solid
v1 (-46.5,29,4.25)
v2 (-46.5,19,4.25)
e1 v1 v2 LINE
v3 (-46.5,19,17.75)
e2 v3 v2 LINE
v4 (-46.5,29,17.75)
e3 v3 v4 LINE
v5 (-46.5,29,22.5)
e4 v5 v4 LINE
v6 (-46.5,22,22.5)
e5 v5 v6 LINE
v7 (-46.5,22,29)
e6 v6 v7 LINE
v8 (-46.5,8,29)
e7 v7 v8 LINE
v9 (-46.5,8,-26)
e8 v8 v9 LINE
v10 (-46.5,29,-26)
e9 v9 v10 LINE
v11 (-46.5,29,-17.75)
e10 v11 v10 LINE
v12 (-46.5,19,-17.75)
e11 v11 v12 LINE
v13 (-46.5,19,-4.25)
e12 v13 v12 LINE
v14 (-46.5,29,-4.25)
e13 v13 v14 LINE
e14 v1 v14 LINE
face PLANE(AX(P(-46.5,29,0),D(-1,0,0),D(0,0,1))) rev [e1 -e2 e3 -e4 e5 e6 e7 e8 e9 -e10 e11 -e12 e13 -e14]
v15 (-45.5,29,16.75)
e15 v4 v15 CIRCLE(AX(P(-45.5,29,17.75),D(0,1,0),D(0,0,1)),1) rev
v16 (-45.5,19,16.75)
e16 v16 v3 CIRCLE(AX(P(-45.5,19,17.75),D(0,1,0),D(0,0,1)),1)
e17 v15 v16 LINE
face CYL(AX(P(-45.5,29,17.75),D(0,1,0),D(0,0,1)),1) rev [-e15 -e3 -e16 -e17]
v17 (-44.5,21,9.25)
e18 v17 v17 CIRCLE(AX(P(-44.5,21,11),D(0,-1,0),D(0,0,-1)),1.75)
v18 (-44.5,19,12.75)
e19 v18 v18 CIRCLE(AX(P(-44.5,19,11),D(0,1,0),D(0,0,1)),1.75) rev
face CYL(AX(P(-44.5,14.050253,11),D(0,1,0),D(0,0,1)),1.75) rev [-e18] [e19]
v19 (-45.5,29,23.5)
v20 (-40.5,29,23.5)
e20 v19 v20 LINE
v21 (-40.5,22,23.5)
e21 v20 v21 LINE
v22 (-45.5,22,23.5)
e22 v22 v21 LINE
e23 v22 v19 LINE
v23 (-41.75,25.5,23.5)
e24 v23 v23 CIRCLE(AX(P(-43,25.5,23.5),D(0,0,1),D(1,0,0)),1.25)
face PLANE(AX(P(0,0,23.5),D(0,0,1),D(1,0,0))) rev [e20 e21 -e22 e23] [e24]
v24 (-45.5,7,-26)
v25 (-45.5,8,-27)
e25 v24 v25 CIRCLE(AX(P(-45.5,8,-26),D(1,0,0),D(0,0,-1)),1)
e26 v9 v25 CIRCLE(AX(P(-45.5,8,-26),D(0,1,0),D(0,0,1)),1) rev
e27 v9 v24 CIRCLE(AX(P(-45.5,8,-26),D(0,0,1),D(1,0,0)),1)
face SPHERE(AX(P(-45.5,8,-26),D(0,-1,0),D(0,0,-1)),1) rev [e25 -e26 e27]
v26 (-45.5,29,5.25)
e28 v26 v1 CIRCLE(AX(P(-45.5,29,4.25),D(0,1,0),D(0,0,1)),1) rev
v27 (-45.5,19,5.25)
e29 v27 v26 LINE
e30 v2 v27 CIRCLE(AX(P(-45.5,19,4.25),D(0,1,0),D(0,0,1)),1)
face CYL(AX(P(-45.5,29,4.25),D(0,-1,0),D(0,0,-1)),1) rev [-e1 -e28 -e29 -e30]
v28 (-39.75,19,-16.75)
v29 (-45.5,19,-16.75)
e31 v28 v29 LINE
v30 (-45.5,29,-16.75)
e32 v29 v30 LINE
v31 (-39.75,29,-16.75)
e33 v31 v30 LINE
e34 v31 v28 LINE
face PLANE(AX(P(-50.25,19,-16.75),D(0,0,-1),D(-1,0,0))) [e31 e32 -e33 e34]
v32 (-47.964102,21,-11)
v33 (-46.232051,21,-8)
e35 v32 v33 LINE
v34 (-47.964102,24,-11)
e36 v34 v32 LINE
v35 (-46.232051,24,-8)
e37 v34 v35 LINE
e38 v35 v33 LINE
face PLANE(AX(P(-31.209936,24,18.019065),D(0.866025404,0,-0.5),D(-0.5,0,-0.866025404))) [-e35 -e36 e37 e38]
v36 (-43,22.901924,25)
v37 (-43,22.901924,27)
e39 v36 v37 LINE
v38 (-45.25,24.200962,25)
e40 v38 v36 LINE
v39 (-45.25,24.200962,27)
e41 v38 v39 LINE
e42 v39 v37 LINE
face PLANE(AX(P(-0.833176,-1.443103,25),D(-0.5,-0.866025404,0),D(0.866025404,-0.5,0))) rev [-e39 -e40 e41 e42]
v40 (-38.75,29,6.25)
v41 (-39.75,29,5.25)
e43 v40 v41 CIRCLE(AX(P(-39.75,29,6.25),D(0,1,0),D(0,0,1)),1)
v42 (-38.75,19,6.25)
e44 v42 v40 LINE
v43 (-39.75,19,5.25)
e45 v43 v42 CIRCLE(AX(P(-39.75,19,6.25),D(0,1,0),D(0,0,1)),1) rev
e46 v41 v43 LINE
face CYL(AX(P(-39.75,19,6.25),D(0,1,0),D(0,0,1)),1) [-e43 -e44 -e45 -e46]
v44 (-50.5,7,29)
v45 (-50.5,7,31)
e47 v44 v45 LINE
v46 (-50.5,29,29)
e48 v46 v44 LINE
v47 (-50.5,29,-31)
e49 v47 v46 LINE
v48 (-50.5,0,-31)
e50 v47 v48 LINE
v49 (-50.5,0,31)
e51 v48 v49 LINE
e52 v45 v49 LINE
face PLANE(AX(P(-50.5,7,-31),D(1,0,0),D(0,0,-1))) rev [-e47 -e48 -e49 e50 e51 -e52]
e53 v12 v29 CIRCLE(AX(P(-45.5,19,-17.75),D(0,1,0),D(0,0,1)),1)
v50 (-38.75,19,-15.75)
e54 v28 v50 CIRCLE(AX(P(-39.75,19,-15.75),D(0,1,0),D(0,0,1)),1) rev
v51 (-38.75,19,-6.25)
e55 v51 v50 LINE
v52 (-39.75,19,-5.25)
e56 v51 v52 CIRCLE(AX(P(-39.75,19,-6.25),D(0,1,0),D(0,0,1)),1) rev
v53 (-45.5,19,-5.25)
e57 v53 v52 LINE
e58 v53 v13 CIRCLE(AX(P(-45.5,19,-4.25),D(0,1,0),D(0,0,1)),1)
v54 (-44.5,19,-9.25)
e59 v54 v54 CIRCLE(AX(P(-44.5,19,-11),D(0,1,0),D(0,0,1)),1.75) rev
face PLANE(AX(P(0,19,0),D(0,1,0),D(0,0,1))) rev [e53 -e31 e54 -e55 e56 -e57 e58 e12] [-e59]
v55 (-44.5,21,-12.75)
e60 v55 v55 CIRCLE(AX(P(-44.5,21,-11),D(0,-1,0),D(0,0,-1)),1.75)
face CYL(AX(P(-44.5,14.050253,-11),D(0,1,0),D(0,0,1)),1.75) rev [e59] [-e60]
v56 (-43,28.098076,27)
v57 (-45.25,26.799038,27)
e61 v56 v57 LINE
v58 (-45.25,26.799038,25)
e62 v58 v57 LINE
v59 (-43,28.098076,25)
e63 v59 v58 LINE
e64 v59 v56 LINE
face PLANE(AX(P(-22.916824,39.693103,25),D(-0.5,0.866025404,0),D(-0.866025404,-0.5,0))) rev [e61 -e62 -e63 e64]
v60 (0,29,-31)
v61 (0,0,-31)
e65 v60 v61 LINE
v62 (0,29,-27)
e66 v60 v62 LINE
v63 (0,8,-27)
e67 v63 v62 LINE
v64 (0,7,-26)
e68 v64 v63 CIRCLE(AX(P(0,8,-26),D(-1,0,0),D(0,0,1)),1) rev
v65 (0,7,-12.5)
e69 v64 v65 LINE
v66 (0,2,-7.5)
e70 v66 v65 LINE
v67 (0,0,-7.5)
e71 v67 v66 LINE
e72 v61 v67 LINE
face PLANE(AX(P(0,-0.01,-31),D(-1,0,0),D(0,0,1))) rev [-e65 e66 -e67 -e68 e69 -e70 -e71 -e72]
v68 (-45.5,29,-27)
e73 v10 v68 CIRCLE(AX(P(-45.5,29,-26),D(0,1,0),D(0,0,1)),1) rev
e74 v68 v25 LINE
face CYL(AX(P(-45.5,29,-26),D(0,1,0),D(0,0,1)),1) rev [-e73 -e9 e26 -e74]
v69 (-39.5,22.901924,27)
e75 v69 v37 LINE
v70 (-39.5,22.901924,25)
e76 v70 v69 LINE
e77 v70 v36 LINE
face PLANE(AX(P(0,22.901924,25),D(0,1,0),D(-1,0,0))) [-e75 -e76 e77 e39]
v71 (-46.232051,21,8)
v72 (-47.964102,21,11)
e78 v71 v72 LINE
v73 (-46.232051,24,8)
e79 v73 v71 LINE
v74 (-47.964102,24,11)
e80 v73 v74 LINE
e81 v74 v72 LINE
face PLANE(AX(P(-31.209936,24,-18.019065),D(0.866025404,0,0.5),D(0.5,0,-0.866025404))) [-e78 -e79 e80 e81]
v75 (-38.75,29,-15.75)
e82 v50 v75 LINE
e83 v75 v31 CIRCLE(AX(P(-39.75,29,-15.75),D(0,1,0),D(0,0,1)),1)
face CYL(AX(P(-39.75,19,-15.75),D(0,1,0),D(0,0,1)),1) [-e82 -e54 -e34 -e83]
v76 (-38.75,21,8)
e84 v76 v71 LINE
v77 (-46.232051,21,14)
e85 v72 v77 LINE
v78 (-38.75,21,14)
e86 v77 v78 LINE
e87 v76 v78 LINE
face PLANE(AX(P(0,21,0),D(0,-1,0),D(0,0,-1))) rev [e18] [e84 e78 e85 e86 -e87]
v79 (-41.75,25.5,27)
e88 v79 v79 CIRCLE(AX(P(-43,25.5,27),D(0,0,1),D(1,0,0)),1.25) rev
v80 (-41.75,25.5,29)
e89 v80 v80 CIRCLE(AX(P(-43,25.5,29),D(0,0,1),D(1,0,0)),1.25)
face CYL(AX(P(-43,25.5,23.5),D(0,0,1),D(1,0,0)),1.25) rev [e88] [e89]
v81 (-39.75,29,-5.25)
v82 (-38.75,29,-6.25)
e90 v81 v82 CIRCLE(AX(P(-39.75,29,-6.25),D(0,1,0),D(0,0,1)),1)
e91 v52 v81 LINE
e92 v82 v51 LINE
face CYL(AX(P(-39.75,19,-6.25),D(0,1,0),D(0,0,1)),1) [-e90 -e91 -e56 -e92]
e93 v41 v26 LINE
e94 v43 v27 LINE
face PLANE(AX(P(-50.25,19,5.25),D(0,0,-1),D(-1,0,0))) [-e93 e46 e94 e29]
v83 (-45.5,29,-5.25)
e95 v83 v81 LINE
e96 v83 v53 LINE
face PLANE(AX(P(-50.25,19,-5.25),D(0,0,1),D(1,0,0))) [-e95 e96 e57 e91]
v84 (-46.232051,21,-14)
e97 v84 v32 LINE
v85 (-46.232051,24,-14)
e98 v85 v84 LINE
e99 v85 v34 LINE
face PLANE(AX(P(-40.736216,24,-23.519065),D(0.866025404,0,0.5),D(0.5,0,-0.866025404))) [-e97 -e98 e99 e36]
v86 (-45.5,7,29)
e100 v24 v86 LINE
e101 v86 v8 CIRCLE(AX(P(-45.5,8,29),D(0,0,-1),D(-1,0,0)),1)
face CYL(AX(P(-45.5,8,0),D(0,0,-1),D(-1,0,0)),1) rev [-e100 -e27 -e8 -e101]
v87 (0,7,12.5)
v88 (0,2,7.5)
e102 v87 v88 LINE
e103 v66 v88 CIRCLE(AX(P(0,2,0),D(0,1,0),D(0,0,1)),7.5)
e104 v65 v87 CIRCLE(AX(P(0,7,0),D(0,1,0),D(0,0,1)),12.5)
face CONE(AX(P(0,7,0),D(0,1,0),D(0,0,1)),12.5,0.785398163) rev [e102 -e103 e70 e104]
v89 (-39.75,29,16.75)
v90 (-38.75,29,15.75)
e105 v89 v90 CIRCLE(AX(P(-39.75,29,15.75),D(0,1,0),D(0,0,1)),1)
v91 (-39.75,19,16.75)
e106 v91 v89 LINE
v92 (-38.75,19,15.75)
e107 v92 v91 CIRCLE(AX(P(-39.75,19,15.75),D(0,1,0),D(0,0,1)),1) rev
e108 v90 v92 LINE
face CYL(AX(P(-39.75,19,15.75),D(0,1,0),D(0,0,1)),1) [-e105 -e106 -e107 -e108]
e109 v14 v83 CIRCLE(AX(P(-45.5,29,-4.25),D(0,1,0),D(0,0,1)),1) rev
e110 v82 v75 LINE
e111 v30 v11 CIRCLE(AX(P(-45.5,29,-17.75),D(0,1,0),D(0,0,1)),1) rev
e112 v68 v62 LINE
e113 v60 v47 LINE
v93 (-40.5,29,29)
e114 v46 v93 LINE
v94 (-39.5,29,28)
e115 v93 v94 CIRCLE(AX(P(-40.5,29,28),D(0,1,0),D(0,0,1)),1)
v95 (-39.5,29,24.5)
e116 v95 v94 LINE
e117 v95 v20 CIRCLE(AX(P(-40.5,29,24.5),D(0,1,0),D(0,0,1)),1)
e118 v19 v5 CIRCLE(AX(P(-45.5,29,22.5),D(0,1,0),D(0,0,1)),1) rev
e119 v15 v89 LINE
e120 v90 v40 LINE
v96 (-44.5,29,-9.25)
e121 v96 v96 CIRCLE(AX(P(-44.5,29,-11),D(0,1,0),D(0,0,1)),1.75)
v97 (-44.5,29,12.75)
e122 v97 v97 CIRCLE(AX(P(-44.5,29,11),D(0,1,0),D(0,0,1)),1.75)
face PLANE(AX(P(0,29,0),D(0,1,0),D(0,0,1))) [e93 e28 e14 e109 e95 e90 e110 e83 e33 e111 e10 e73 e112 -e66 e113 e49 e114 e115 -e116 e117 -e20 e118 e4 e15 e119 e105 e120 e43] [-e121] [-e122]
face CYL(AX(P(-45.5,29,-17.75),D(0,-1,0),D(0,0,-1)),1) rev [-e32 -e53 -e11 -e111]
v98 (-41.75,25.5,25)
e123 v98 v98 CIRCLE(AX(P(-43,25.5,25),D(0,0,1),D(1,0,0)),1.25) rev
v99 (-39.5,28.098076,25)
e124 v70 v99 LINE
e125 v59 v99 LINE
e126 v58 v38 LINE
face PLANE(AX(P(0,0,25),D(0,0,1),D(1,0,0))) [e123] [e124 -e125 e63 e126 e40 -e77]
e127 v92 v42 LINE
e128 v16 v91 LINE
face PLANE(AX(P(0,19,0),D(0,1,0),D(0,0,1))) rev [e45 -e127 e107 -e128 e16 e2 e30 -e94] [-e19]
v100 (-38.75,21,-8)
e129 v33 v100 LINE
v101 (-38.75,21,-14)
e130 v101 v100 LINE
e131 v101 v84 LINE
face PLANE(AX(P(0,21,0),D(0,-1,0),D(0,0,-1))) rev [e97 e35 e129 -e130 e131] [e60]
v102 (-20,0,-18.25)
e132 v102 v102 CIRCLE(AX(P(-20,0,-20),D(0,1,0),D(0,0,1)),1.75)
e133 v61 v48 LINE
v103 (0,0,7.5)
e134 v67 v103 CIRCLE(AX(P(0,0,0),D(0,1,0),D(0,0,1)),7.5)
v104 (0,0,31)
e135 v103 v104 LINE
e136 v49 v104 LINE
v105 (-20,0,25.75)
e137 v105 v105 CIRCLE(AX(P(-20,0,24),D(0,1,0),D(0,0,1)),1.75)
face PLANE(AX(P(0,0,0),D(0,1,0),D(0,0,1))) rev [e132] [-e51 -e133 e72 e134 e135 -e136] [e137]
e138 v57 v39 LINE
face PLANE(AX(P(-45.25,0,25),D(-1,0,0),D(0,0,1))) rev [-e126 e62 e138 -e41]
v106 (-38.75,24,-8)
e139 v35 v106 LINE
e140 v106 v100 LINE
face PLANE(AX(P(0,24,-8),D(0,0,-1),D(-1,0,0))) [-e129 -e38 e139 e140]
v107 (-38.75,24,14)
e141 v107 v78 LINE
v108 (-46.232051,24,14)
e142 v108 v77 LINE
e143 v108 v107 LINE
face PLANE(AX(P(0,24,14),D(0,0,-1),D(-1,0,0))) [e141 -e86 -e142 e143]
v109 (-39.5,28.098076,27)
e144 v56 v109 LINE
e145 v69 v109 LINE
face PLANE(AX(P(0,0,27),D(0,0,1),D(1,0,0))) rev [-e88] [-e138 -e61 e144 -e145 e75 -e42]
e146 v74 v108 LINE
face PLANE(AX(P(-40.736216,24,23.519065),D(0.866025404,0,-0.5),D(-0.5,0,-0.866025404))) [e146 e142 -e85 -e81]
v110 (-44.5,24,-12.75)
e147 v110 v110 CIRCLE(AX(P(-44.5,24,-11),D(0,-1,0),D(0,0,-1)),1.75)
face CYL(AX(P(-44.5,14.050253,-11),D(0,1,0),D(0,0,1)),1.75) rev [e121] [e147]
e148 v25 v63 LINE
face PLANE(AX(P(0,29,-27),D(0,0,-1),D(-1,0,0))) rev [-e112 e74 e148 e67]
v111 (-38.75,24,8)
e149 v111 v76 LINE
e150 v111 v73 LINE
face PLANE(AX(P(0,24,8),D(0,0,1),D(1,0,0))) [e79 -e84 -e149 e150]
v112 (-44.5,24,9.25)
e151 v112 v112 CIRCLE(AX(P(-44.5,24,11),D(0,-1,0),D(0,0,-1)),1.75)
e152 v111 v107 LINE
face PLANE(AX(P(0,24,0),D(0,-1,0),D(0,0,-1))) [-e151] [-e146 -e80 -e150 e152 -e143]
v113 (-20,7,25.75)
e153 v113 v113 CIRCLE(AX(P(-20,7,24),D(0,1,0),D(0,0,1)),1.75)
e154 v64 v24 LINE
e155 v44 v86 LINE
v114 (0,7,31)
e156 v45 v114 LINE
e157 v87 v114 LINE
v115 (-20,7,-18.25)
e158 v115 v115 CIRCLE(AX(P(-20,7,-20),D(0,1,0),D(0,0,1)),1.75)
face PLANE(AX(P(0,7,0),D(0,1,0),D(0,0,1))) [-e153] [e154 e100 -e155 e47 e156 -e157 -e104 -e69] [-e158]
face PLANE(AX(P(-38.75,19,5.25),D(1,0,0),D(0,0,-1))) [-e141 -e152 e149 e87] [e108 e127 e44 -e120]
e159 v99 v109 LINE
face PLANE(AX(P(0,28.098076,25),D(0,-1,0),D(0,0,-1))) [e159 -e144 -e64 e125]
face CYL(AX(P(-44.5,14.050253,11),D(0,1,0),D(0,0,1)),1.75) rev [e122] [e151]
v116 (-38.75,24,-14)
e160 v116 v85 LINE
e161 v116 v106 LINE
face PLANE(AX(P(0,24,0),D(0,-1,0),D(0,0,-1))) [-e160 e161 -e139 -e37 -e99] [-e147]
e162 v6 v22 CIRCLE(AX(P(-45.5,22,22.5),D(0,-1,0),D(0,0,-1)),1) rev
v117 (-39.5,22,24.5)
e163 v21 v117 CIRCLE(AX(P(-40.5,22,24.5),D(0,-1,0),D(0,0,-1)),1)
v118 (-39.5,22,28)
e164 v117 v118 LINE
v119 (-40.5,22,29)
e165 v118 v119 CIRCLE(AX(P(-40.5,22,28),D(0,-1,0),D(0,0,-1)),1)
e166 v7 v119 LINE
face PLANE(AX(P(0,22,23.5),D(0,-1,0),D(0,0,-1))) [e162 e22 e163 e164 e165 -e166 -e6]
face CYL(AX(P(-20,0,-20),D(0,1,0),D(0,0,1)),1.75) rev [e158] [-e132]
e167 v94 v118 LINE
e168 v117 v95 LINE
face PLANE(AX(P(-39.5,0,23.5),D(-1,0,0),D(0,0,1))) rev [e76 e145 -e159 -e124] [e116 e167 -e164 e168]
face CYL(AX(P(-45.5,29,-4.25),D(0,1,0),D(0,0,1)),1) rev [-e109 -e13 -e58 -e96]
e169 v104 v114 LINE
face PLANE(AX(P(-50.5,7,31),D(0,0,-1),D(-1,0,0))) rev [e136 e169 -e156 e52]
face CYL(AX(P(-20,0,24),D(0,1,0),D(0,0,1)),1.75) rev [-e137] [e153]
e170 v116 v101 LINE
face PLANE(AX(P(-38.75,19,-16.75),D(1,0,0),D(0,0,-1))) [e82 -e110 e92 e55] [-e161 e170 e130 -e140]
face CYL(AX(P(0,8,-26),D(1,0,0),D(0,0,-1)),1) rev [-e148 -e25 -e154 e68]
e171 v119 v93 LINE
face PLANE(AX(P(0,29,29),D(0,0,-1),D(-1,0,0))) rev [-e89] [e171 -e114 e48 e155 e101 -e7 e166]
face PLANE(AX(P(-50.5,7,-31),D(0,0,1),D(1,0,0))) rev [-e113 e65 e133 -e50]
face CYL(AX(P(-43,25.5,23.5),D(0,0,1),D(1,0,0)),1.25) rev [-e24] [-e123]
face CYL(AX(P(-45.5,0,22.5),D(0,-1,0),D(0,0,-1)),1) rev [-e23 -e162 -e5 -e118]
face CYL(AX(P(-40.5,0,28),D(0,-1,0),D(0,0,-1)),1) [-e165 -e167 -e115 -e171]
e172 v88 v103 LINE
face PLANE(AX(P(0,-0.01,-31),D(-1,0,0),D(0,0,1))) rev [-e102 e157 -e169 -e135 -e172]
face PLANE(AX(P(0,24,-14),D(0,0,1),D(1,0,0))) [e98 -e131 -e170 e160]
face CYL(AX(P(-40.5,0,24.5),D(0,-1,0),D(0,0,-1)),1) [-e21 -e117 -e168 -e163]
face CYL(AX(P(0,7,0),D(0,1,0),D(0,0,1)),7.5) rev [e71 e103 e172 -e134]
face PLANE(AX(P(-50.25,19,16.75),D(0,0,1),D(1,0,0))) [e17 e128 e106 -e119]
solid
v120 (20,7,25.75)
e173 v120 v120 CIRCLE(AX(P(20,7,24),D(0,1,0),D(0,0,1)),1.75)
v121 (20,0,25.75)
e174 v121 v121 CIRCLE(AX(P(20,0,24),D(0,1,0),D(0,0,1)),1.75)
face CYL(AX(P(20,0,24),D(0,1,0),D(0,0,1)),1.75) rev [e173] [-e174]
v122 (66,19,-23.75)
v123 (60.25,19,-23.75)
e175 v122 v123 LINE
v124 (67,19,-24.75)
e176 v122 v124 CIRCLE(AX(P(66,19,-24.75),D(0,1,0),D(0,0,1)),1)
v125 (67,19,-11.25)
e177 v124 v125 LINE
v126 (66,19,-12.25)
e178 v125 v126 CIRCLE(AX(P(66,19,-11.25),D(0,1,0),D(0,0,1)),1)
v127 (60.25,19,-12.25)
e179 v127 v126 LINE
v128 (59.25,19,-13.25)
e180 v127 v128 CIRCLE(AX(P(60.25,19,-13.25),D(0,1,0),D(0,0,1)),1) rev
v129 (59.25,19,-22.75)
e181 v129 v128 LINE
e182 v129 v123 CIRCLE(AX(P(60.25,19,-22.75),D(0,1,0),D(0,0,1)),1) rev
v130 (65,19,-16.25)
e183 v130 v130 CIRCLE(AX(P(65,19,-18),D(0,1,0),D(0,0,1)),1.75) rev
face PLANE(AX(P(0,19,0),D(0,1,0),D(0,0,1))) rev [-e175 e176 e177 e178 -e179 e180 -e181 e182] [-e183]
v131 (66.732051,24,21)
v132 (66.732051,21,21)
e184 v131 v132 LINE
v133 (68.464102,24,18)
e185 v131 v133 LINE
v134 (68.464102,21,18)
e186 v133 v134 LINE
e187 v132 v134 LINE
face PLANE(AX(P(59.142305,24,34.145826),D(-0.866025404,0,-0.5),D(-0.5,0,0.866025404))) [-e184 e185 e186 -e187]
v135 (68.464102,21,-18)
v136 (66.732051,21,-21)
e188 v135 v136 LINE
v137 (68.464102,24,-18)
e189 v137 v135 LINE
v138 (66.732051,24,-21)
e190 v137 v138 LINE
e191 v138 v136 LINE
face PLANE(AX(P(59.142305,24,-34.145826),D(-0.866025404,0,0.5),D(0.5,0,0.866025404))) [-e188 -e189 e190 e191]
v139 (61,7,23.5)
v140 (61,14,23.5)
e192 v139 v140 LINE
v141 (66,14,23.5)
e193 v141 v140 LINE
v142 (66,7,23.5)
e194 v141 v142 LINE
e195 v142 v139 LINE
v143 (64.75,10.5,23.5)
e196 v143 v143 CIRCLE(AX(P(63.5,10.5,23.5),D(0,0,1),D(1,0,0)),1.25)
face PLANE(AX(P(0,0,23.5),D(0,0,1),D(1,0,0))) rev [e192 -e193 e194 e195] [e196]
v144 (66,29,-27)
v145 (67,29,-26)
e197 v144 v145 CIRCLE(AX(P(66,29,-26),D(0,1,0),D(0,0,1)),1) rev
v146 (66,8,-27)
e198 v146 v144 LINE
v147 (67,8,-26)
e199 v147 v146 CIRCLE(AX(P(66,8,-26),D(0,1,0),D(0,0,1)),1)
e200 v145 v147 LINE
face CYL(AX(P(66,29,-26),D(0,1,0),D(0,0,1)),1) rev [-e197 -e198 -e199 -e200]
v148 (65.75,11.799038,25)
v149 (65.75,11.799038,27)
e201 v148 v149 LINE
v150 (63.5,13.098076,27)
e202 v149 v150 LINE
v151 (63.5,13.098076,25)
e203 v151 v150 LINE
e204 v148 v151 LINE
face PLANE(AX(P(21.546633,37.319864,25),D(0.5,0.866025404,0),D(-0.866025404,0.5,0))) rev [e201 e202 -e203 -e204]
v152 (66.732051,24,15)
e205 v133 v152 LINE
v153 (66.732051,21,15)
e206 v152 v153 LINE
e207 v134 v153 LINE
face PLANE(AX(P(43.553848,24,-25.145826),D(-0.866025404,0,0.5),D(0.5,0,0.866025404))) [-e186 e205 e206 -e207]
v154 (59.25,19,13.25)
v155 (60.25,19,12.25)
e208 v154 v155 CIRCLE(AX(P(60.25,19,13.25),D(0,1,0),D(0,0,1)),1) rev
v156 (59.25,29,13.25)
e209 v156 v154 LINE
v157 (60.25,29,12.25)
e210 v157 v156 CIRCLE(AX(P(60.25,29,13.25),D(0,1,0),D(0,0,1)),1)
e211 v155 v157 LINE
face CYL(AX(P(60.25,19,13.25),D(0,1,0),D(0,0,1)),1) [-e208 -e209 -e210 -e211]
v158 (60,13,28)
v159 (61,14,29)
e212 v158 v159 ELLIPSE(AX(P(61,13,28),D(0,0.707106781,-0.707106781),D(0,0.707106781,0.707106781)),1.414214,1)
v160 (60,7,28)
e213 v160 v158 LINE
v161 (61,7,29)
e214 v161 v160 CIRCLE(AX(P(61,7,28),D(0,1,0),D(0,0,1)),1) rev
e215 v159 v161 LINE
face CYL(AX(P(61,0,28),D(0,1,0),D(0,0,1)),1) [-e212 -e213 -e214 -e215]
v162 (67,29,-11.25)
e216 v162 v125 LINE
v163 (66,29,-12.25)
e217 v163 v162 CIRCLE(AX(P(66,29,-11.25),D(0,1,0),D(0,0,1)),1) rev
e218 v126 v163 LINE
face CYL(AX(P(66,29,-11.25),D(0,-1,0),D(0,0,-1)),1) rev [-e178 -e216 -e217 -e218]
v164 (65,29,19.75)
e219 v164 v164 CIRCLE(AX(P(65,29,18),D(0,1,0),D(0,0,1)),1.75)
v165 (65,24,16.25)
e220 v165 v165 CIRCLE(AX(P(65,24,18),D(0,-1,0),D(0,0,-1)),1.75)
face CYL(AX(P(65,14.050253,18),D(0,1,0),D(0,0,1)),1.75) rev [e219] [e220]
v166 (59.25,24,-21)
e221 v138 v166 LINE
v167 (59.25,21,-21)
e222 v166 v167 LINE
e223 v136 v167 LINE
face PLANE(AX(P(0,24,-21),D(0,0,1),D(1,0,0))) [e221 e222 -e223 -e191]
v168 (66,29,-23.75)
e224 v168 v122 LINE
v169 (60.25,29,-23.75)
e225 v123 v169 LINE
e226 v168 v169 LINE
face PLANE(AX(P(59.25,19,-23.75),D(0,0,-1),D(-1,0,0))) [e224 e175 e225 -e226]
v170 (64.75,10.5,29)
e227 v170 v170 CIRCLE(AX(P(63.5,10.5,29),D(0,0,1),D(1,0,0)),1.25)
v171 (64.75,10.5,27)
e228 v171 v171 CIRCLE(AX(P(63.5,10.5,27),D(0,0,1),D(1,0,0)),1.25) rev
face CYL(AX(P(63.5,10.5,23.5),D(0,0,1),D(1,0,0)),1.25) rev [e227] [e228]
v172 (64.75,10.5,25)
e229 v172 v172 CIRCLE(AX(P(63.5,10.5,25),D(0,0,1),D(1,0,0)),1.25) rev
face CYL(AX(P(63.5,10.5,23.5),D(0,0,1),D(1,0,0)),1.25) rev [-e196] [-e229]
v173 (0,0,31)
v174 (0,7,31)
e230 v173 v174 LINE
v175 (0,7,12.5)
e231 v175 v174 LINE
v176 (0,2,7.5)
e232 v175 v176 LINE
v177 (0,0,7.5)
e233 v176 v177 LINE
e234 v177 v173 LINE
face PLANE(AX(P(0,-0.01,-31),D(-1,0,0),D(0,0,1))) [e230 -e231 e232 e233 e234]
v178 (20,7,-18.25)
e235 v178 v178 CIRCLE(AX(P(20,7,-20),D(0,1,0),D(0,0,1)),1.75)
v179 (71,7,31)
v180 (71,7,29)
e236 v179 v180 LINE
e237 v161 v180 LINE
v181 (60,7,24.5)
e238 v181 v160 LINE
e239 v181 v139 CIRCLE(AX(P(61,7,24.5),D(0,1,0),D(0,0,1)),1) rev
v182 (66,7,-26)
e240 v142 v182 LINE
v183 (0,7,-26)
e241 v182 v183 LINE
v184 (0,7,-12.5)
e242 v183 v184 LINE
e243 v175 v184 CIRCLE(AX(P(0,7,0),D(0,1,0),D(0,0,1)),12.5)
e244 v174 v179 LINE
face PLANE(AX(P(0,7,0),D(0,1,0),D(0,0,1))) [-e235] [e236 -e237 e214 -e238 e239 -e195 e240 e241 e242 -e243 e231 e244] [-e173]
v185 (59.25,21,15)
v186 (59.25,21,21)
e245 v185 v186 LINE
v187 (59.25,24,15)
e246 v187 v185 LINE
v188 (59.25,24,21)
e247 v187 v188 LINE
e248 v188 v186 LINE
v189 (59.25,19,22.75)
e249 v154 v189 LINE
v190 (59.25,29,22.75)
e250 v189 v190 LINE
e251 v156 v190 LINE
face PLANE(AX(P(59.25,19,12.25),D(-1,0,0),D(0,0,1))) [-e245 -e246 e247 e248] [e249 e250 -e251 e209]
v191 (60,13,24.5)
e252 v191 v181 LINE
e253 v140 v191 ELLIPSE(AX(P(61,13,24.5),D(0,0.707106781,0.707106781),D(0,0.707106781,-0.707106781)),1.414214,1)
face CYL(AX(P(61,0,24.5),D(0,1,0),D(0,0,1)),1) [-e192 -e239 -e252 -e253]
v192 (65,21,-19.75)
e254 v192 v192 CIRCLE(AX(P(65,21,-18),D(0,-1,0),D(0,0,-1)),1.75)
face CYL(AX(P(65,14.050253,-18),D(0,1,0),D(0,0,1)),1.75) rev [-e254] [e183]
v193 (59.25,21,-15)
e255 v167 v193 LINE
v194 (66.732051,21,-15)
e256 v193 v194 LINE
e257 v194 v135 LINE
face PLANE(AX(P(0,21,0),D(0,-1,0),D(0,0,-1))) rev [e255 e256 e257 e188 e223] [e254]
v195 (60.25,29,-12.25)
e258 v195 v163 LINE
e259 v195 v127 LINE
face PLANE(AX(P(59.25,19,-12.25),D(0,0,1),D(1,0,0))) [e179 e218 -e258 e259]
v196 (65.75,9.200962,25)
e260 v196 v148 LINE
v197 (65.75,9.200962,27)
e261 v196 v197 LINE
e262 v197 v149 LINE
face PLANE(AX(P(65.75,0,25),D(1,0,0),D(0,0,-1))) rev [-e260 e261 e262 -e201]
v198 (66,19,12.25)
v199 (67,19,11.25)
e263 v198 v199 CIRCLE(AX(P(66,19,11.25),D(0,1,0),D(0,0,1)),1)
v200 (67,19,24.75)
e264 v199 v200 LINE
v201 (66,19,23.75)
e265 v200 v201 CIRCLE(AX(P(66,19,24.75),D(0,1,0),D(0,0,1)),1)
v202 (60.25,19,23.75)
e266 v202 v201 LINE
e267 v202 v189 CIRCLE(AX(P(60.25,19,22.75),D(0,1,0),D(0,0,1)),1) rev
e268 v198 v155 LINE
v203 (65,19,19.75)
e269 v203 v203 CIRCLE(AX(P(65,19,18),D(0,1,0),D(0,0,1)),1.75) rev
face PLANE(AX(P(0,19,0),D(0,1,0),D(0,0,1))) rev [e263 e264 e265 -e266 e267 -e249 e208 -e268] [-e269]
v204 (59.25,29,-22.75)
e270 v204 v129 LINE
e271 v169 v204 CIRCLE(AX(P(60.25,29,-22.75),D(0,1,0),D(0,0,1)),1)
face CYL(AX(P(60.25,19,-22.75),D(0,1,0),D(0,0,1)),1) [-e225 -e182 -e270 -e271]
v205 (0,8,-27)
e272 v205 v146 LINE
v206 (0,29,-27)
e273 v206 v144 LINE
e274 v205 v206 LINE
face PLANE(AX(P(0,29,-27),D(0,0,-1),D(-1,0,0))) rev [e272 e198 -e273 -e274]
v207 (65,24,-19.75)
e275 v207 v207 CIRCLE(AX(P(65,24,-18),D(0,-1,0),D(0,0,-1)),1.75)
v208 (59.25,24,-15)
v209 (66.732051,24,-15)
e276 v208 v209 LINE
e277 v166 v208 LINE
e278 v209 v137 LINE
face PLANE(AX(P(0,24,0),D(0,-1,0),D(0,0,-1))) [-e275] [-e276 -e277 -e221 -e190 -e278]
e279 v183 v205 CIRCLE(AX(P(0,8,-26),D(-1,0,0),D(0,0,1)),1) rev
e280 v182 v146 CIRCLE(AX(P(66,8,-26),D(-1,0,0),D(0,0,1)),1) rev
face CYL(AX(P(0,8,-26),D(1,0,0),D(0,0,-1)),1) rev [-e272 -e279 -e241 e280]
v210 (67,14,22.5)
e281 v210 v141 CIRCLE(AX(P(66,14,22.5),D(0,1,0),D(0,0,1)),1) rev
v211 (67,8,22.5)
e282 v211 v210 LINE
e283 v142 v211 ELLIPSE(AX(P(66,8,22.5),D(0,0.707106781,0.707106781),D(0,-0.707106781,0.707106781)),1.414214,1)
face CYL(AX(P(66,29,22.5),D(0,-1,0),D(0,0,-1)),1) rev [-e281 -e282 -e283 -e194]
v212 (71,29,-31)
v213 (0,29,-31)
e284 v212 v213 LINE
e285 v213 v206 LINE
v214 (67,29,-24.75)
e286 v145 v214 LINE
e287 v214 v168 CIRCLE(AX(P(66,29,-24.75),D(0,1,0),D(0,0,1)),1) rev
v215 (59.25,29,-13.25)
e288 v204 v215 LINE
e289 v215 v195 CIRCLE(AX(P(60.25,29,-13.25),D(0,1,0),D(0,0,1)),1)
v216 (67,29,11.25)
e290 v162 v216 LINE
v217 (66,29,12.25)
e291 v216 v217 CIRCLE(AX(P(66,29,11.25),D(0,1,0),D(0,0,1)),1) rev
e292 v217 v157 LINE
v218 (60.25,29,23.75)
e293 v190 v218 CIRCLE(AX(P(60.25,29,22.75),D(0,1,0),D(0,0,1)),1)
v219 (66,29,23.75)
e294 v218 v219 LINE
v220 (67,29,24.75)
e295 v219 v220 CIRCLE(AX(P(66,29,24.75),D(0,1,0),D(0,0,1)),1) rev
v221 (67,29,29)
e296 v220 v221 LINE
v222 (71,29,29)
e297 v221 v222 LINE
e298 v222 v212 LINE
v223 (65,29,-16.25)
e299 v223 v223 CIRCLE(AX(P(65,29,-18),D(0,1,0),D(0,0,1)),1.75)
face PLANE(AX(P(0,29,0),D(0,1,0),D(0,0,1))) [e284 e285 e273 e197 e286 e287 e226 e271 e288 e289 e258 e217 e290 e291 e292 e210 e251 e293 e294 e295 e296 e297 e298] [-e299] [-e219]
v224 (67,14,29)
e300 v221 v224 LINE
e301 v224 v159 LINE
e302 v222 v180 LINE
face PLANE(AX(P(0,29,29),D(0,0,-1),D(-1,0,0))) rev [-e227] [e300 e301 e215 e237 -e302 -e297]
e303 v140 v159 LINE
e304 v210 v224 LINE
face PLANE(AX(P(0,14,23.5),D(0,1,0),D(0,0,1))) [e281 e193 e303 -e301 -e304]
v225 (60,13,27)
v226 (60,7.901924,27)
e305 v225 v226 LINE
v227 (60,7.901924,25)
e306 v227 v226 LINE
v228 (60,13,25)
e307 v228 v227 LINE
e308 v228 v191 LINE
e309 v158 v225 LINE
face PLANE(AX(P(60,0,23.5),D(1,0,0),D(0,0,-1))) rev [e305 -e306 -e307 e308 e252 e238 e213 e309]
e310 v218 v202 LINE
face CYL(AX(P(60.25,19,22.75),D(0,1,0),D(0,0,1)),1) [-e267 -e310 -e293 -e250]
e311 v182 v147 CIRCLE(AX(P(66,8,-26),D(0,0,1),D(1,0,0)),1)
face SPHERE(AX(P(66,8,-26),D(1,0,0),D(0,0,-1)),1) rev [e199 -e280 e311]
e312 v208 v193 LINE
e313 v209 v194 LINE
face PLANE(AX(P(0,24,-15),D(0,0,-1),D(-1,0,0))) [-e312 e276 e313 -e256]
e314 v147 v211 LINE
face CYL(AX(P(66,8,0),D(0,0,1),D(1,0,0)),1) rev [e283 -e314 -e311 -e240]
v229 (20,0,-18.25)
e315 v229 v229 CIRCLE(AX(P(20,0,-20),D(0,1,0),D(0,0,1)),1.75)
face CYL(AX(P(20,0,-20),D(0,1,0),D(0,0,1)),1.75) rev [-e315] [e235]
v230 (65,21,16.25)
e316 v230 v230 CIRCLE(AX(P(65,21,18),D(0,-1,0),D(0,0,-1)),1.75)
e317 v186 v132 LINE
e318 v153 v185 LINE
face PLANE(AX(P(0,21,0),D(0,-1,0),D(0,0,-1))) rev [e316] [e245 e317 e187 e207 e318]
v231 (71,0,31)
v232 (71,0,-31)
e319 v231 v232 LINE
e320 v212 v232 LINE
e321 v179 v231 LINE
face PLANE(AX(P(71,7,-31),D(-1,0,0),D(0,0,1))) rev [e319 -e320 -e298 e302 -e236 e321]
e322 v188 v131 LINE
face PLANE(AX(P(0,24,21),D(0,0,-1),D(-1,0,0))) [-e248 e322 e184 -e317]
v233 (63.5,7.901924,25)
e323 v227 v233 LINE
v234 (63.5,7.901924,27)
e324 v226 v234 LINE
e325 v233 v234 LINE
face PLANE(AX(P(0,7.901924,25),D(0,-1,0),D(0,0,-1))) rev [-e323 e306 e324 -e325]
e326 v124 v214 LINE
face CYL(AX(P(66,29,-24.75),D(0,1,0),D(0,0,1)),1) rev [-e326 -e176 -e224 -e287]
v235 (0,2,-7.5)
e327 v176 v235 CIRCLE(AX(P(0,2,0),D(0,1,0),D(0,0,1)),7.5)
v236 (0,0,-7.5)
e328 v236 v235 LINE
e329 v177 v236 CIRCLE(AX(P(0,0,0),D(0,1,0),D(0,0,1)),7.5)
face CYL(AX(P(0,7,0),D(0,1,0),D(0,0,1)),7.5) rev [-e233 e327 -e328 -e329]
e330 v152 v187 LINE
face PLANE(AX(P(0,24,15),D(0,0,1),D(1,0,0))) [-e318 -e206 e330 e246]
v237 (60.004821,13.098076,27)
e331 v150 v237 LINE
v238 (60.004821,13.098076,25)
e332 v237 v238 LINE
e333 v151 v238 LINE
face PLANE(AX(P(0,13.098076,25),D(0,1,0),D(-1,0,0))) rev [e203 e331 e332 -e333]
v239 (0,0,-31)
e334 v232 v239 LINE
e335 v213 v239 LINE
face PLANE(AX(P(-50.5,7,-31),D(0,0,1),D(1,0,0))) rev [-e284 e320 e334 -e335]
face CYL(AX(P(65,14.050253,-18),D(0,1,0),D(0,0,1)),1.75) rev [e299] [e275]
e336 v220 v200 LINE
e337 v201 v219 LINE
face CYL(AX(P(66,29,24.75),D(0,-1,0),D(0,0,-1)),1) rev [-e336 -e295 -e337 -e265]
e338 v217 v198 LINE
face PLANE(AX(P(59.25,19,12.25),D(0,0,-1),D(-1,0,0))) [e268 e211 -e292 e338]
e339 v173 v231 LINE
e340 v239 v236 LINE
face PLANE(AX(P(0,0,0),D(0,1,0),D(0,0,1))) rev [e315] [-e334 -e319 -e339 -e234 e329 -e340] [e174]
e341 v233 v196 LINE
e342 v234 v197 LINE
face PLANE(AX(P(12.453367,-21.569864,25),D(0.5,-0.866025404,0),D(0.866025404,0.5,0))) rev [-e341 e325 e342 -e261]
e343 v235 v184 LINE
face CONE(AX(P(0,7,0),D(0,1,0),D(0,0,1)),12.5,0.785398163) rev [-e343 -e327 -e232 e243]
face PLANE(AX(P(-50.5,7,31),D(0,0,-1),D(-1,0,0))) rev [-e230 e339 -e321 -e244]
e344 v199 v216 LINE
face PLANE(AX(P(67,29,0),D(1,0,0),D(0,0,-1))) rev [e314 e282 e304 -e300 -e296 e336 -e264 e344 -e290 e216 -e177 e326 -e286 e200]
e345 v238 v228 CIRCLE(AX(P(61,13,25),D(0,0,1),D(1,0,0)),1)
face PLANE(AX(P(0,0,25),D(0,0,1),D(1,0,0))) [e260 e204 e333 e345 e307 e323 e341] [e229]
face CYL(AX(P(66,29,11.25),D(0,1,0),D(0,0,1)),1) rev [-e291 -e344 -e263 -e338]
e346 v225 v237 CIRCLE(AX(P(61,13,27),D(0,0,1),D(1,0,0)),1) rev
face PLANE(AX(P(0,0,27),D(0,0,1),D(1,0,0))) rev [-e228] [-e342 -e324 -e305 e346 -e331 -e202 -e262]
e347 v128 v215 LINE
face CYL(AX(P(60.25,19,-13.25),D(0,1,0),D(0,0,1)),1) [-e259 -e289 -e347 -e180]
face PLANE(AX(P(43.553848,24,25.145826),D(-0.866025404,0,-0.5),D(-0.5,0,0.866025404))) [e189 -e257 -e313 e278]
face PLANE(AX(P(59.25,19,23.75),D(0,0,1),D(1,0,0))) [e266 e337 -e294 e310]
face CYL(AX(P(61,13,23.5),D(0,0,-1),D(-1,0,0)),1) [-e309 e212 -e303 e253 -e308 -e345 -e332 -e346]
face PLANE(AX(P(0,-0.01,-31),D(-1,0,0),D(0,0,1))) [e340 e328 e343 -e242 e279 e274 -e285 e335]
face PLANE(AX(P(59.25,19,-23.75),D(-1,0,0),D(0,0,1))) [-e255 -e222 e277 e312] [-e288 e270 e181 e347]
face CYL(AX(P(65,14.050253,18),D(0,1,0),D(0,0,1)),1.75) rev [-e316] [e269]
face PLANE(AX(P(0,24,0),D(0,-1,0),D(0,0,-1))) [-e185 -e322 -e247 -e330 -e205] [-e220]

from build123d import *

# Parameters (mm, degrees)
SKETCH1_W              = 121.5
SKETCH1_H              = 62
BOSS_EXTRUDE1_DEPTH    = 7
BOSS_EXTRUDE2_DEPTH    = 22
SKETCH5_W              = 11.5
SKETCH5_H              = 11.5
BOSS_EXTRUDE3_DEPTH    = 10
CUT_EXTRUDE1_START     = 2
CUT_EXTRUDE1_DEPTH     = 3
CUT_EXTRUDE2_REACH     = 84.722
SKETCH7_R              = 1.75
SKETCH8_W              = 7
SKETCH8_H              = 7
SKETCH8_R              = 1.25
BOSS_EXTRUDE5_DEPTH    = 5.5
CUT_EXTRUDE3_START     = -2
SKETCH9_R              = 1.25
CUT_EXTRUDE3_DEPTH     = 2
SKETCH11_R             = 1.75
CUT_EXTRUDE4_DEPTH     = 81.535706367
FILLET1_R              = 1
SPLIT1_SURFACE_1_BACK  = 140.453
SPLIT1_SURFACE_1_DEPTH = 280.906
SPLIT1_SURFACE_2_BACK  = 140.453
SPLIT1_SURFACE_2_DEPTH = 280.906


with BuildPart() as part:
    # Sketch1 → Boss-Extrude1 (new body)
    with BuildSketch(Plane(origin=(0, 0, 0), x_dir=(1, 0, 0), z_dir=(0, 1, 0))):
        with Locations((10.25, 0)):
            Rectangle(SKETCH1_W, SKETCH1_H)
    extrude(amount=BOSS_EXTRUDE1_DEPTH)

    # Sketch3 → CSK for M10 Flat Head Machine Screw1 (revolve, cut)
    with BuildSketch(Plane(origin=(0, 7, 0), x_dir=(0, 0, 1), z_dir=(1, 0, 0))):
        Polygon((0, 0), (0, 7), (7.5, 7), (7.5, 5), (12.5, 0), align=None)
    revolve(axis=Axis((0, 13.35, 0), (0, -1, 0)), mode=Mode.SUBTRACT)

    # Sketch4 → Boss-Extrude2 (add)
    with BuildSketch(Plane(origin=(0, 7, 0), x_dir=(1, 0, 0), z_dir=(0, 1, 0))):
        Polygon((71, 31), (-50.5, 31), (-50.5, -29), (-46.5, -29), (-46.5, 27), (67, 27), (67, -29), (71, -29), align=None)
    extrude(amount=BOSS_EXTRUDE2_DEPTH)

    # Sketch5 → Boss-Extrude3 (add)
    with BuildSketch(Plane(origin=(0, 29, 0), x_dir=(1, 0, 0), z_dir=(0, 1, 0))):
        with Locations((-44.5, 11)):
            Rectangle(SKETCH5_W, SKETCH5_H)
        with Locations((-44.5, -11)):
            Rectangle(SKETCH5_W, SKETCH5_H)
        with Locations((65, 18)):
            Rectangle(SKETCH5_W, SKETCH5_H)
        with Locations((65, -18)):
            Rectangle(SKETCH5_W, SKETCH5_H)
    extrude(amount=-BOSS_EXTRUDE3_DEPTH)

    # Sketch6 → Cut-Extrude1 (cut)
    with BuildSketch(Plane(origin=(0, 19, 0), x_dir=(1, 0, 0), z_dir=(0, 1, 0)).offset(CUT_EXTRUDE1_START)):
        Polygon((-38.75, -8), (-46.232050808, -8), (-47.964101615, -11), (-46.232050808, -14), (-38.75, -14), align=None)
        Polygon((-47.964101615, 11), (-46.232050808, 8), (-38.75, 8), (-38.75, 14), (-46.232050808, 14), align=None)
        Polygon((66.732050808, 15), (68.464101615, 18), (66.732050808, 21), (59.25, 21), (59.25, 15), align=None)
        Polygon((66.732050808, -21), (68.464101615, -18), (66.732050808, -15), (59.25, -15), (59.25, -21), align=None)
    extrude(amount=CUT_EXTRUDE1_DEPTH, mode=Mode.SUBTRACT)

    # Cut-Extrude2: up to this face of the body (flat: up to its plane)
    cut_extrude2_end = Plane(part.part.faces().sort_by_distance((63.125, 19, 18))[0])
    # Sketch7 → Cut-Extrude2 (cut, up to the picked face)
    with BuildSketch(Plane(origin=(0, 29, 0), x_dir=(1, 0, 0), z_dir=(0, 1, 0)), mode=Mode.PRIVATE) as cut_extrude2_sk1:
        with Locations(Location((-44.5, 11, 0), (0, 0, 270))):
            Circle(SKETCH7_R)
    cut_extrude2_tool1 = split(extrude(cut_extrude2_sk1.sketch, amount=-CUT_EXTRUDE2_REACH, mode=Mode.PRIVATE), bisect_by=cut_extrude2_end, keep=Keep.BOTH, mode=Mode.PRIVATE)
    # Sketch7 → Cut-Extrude2 (cut, up to the picked face)
    with BuildSketch(Plane(origin=(0, 29, 0), x_dir=(1, 0, 0), z_dir=(0, 1, 0)), mode=Mode.PRIVATE) as cut_extrude2_sk2:
        with Locations(Location((-44.5, -11, 0), (0, 0, 270))):
            Circle(SKETCH7_R)
    cut_extrude2_tool2 = split(extrude(cut_extrude2_sk2.sketch, amount=-CUT_EXTRUDE2_REACH, mode=Mode.PRIVATE), bisect_by=cut_extrude2_end, keep=Keep.BOTH, mode=Mode.PRIVATE)
    # Sketch7 → Cut-Extrude2 (cut, up to the picked face)
    with BuildSketch(Plane(origin=(0, 29, 0), x_dir=(1, 0, 0), z_dir=(0, 1, 0)), mode=Mode.PRIVATE) as cut_extrude2_sk3:
        with Locations(Location((65, 18, 0), (0, 0, 270))):
            Circle(SKETCH7_R)
    cut_extrude2_tool3 = split(extrude(cut_extrude2_sk3.sketch, amount=-CUT_EXTRUDE2_REACH, mode=Mode.PRIVATE), bisect_by=cut_extrude2_end, keep=Keep.BOTH, mode=Mode.PRIVATE)
    # Sketch7 → Cut-Extrude2 (cut, up to the picked face)
    with BuildSketch(Plane(origin=(0, 29, 0), x_dir=(1, 0, 0), z_dir=(0, 1, 0)), mode=Mode.PRIVATE) as cut_extrude2_sk4:
        with Locations(Location((65, -18, 0), (0, 0, 270))):
            Circle(SKETCH7_R)
    cut_extrude2_tool4 = split(extrude(cut_extrude2_sk4.sketch, amount=-CUT_EXTRUDE2_REACH, mode=Mode.PRIVATE), bisect_by=cut_extrude2_end, keep=Keep.BOTH, mode=Mode.PRIVATE)
    add(cut_extrude2_tool1.solids().sort_by(Axis((-44.5, 29, -11), (0, -1, 0)))[0], mode=Mode.SUBTRACT)
    add(cut_extrude2_tool2.solids().sort_by(Axis((-44.5, 29, 11), (0, -1, 0)))[0], mode=Mode.SUBTRACT)
    add(cut_extrude2_tool3.solids().sort_by(Axis((65, 29, -18), (0, -1, 0)))[0], mode=Mode.SUBTRACT)
    add(cut_extrude2_tool4.solids().sort_by(Axis((65, 29, 18), (0, -1, 0)))[0], mode=Mode.SUBTRACT)

    # Sketch8 → Boss-Extrude5 (add)
    # profile 1 of 2: a face of its own
    with BuildSketch(Plane.XY.offset(29)):
        with Locations((-43, 25.5)):
            Rectangle(SKETCH8_W, SKETCH8_H)
        with Locations((-43, 25.5)):
            Circle(SKETCH8_R, mode=Mode.SUBTRACT)
    # profile 2 of 2: a face of its own
    with BuildSketch(Plane.XY.offset(29)):
        with Locations((63.5, 10.5)):
            Rectangle(SKETCH8_W, SKETCH8_H)
        with Locations((63.5, 10.5)):
            Circle(SKETCH8_R, mode=Mode.SUBTRACT)
    extrude(amount=-BOSS_EXTRUDE5_DEPTH)

    # Sketch9 → Cut-Extrude3 (cut)
    # profile 1 of 4: a face of its own
    with BuildSketch(Plane.XY.offset(29).offset(CUT_EXTRUDE3_START)):
        Polygon((-39.5, 28.098076211), (-43, 28.098076211), (-40.75, 26.799038106), (-40.75, 24.200961894), (-43, 22.901923789), (-39.5, 22.901923789), align=None)
    # profile 2 of 4: a face of its own
    with BuildSketch(Plane.XY.offset(29).offset(CUT_EXTRUDE3_START)):
        Polygon((-45.25, 24.200961894), (-43, 22.901923789), (-40.75, 24.200961894), (-40.75, 26.799038106), (-43, 28.098076211), (-45.25, 26.799038106), align=None)
        with Locations((-43, 25.5)):
            Circle(SKETCH9_R, mode=Mode.SUBTRACT)
    # profile 3 of 4: a face of its own
    with BuildSketch(Plane.XY.offset(29).offset(CUT_EXTRUDE3_START)):
        Polygon((60, 13.098076211), (60, 7.901923789), (63.5, 7.901923789), (61.25, 9.200961894), (61.25, 11.799038106), (63.5, 13.098076211), align=None)
    # profile 4 of 4: a face of its own
    with BuildSketch(Plane.XY.offset(29).offset(CUT_EXTRUDE3_START)):
        Polygon((61.25, 9.200961894), (63.5, 7.901923789), (65.75, 9.200961894), (65.75, 11.799038106), (63.5, 13.098076211), (61.25, 11.799038106), align=None)
    extrude(amount=-CUT_EXTRUDE3_DEPTH, mode=Mode.SUBTRACT)

    # Sketch11 → Cut-Extrude4 (cut, through all)
    with BuildSketch(Plane(origin=(0, 7, 0), x_dir=(1, 0, 0), z_dir=(0, 1, 0))):
        with Locations(Location((-20, 20, 0), (0, 0, 270))):
            Circle(SKETCH11_R)
        with Locations(Location((20, 20, 0), (0, 0, 270))):
            Circle(SKETCH11_R)
        with Locations(Location((-20, -24, 0), (0, 0, 270))):
            Circle(SKETCH11_R)
        with Locations(Location((20, -24, 0), (0, 0, 270))):
            Circle(SKETCH11_R)
    extrude(amount=-CUT_EXTRUDE4_DEPTH, mode=Mode.SUBTRACT)

    # Fillet1
    # the kernel refuses this fillet: 1 mm, written as the material it adds along each edge
    with BuildSketch(Plane(origin=(66, 8, -26), x_dir=(1, 0, 0), z_dir=(0, 0, -1))) as fillet1_piece_1_section:
        Polygon((0, 0), (FILLET1_R, 0), (FILLET1_R, FILLET1_R), (0, FILLET1_R), align=None)
    fillet1_piece_1 = extrude(amount=FILLET1_R, mode=Mode.PRIVATE)
    fillet1_piece_1 = fillet1_piece_1 - Plane(origin=(66, 8, -26), x_dir=(-0.7071067811865475, 0.7071067811865475, 0), z_dir=(0, 0, -1)) * Sphere(FILLET1_R, mode=Mode.PRIVATE)
    add(fillet1_piece_1)
    with BuildSketch(Plane(origin=(-45.5, 8, -26), x_dir=(-1, 0, 0), z_dir=(0, 0, -1))) as fillet1_piece_2_section:
        Polygon((0, 0), (FILLET1_R, 0), (FILLET1_R, -FILLET1_R), (0, -FILLET1_R), align=None)
    fillet1_piece_2 = extrude(amount=FILLET1_R, mode=Mode.PRIVATE)
    fillet1_piece_2 = fillet1_piece_2 - Plane(origin=(-45.5, 8, -26), x_dir=(0.7071067811865475, 0.7071067811865475, 0), z_dir=(0, 0, -1)) * Sphere(FILLET1_R, mode=Mode.PRIVATE)
    add(fillet1_piece_2)
    with BuildSketch(Plane(origin=(67, 14, 23.5), x_dir=(0, 0, -1), z_dir=(0, -1, 0))) as fillet1_piece_3:
        with BuildLine():
            CenterArc((FILLET1_R, -FILLET1_R), FILLET1_R, 90, 90)
            Line((0, -FILLET1_R), (0, 0))
            Line((0, 0), (FILLET1_R, 0))
        make_face()
    extrude(amount=9.5)
    with BuildSketch(Plane(origin=(67, 19, 23.75), x_dir=(0, 0, 1), z_dir=(0, 1, 0)), Plane(origin=(67, 29, 12.25), x_dir=(0, 0, -1), z_dir=(0, -1, 0)), Plane(origin=(67, 19, -12.25), x_dir=(0, 0, 1), z_dir=(0, 1, 0)), Plane(origin=(67, 29, -23.75), x_dir=(0, 0, -1), z_dir=(0, -1, 0)), Plane(origin=(-46.5, 19, -16.75), x_dir=(0, 0, -1), z_dir=(0, 1, 0)), Plane(origin=(-46.5, 29, -5.25), x_dir=(0, 0, 1), z_dir=(0, -1, 0)), Plane(origin=(-46.5, 19, 5.25), x_dir=(0, 0, -1), z_dir=(0, 1, 0)), Plane(origin=(-46.5, 29, 16.75), x_dir=(0, 0, 1), z_dir=(0, -1, 0))) as fillet1_piece_4:
        with BuildLine():
            CenterArc((FILLET1_R, -FILLET1_R), FILLET1_R, 90, 90)
            Line((0, -FILLET1_R), (0, 0))
            Line((0, 0), (FILLET1_R, 0))
        make_face()
    extrude(amount=10)
    with BuildSketch(Plane(origin=(67, 8, -27), x_dir=(-1, 0, 0), z_dir=(0, 1, 0)), Plane(origin=(-46.5, 8, -27), x_dir=(0, 0, 1), z_dir=(0, 1, 0))) as fillet1_piece_5:
        with BuildLine():
            CenterArc((FILLET1_R, FILLET1_R), FILLET1_R, 180, 90)
            Line((0, FILLET1_R), (0, 0))
            Line((0, 0), (FILLET1_R, 0))
        make_face()
    extrude(amount=21)
    with BuildSketch(Plane(origin=(-46.5, 22, 23.5), x_dir=(1, 0, 0), z_dir=(0, 1, 0))) as fillet1_piece_6:
        with BuildLine():
            CenterArc((FILLET1_R, FILLET1_R), FILLET1_R, 180, 90)
            Line((0, FILLET1_R), (0, 0))
            Line((0, 0), (FILLET1_R, 0))
        make_face()
    extrude(amount=7)
    with BuildSketch(Plane(origin=(67, 7, -26), x_dir=(-1, 0, 0), z_dir=(0, 0, 1))) as fillet1_piece_7:
        with BuildLine():
            CenterArc((FILLET1_R, -FILLET1_R), FILLET1_R, 90, 90)
            Line((0, -FILLET1_R), (0, 0))
            Line((0, 0), (FILLET1_R, 0))
        make_face()
    extrude(amount=52)
    with BuildSketch(Plane(origin=(-46.5, 7, 29), x_dir=(1, 0, 0), z_dir=(0, 0, -1))) as fillet1_piece_8:
        with BuildLine():
            CenterArc((FILLET1_R, -FILLET1_R), FILLET1_R, 90, 90)
            Line((0, -FILLET1_R), (0, 0))
            Line((0, 0), (FILLET1_R, 0))
        make_face()
    extrude(amount=55)
    with BuildSketch(Plane(origin=(-45.5, 7, -27), x_dir=(0, 0, 1), z_dir=(1, 0, 0))) as fillet1_piece_9:
        with BuildLine():
            CenterArc((FILLET1_R, -FILLET1_R), FILLET1_R, 90, 90)
            Line((0, -FILLET1_R), (0, 0))
            Line((0, 0), (FILLET1_R, 0))
        make_face()
    extrude(amount=111.5)
    # the kernel refuses this fillet: 1 mm, written as the material it takes off along each edge
    with BuildSketch(Plane(origin=(60, 14, 31.5), x_dir=(1, 0, 0), z_dir=(0, 0, -1))) as fillet1_2_piece_1:
        with BuildLine():
            CenterArc((FILLET1_R, FILLET1_R), FILLET1_R, 180, 90)
            Line((0, FILLET1_R), (0, 0))
            Line((0, 0), (FILLET1_R, 0))
        make_face()
    extrude(amount=10.5, mode=Mode.SUBTRACT)
    with BuildSketch(Plane(origin=(60, 7, 29), x_dir=(1, 0, 0), z_dir=(0, 1, 0)), Plane(origin=(60, 7, 23.5), x_dir=(0, 0, 1), z_dir=(0, 1, 0))) as fillet1_2_piece_2:
        with BuildLine():
            CenterArc((FILLET1_R, FILLET1_R), FILLET1_R, 180, 90)
            Line((0, FILLET1_R), (0, 0))
            Line((0, 0), (FILLET1_R, 0))
        make_face()
    extrude(amount=9.5, mode=Mode.SUBTRACT)
    with BuildSketch(Plane(origin=(59.25, 31.5, 12.25), x_dir=(0, 0, 1), z_dir=(0, -1, 0)), Plane(origin=(59.25, 31.5, 23.75), x_dir=(1, 0, 0), z_dir=(0, -1, 0)), Plane(origin=(59.25, 31.5, -23.75), x_dir=(0, 0, 1), z_dir=(0, -1, 0)), Plane(origin=(59.25, 31.5, -12.25), x_dir=(1, 0, 0), z_dir=(0, -1, 0)), Plane(origin=(-38.75, 31.5, -5.25), x_dir=(0, 0, -1), z_dir=(0, -1, 0)), Plane(origin=(-38.75, 31.5, -16.75), x_dir=(-1, 0, 0), z_dir=(0, -1, 0)), Plane(origin=(-38.75, 31.5, 16.75), x_dir=(0, 0, -1), z_dir=(0, -1, 0)), Plane(origin=(-38.75, 31.5, 5.25), x_dir=(-1, 0, 0), z_dir=(0, -1, 0))) as fillet1_2_piece_3:
        with BuildLine():
            CenterArc((FILLET1_R, -FILLET1_R), FILLET1_R, 90, 90)
            Line((0, -FILLET1_R), (0, 0))
            Line((0, 0), (FILLET1_R, 0))
        make_face()
    extrude(amount=15, mode=Mode.SUBTRACT)
    with BuildSketch(Plane(origin=(-39.5, 31.5, 23.5), x_dir=(-1, 0, 0), z_dir=(0, -1, 0)), Plane(origin=(-39.5, 31.5, 29), x_dir=(0, 0, -1), z_dir=(0, -1, 0))) as fillet1_2_piece_4:
        with BuildLine():
            CenterArc((FILLET1_R, -FILLET1_R), FILLET1_R, 90, 90)
            Line((0, -FILLET1_R), (0, 0))
            Line((0, 0), (FILLET1_R, 0))
        make_face()
    extrude(amount=12, mode=Mode.SUBTRACT)


with BuildPart() as body_2:
    # Split1: the piece behind the surface
    add(part.part)
    # Split1 surface: a surface, the sketch's curves swept straight by 280.906 mm
    with BuildLine(Plane(origin=(0, 29, 0), x_dir=(1, 0, 0), z_dir=(0, 1, 0)).offset(-SPLIT1_SURFACE_1_BACK), mode=Mode.PRIVATE) as split1_surface_1_path:
        Line((0, 31), (0, -31))
    split1_surface_1 = Shell.extrude(split1_surface_1_path.wire(), (0 * SPLIT1_SURFACE_1_DEPTH, 1 * SPLIT1_SURFACE_1_DEPTH, 0 * SPLIT1_SURFACE_1_DEPTH))
    split(bisect_by=split1_surface_1, keep=Keep.BOTTOM)


with BuildPart() as part_1:
    add(part.part)

    # Split1: split by a surface, the side it looks to stays
    # Split1 surface: a surface, the sketch's curves swept straight by 280.906 mm
    with BuildLine(Plane(origin=(0, 29, 0), x_dir=(1, 0, 0), z_dir=(0, 1, 0)).offset(-SPLIT1_SURFACE_2_BACK), mode=Mode.PRIVATE) as split1_surface_2_path:
        Line((0, 31), (0, -31))
    split1_surface_2 = Shell.extrude(split1_surface_2_path.wire(), (0 * SPLIT1_SURFACE_2_DEPTH, 1 * SPLIT1_SURFACE_2_DEPTH, 0 * SPLIT1_SURFACE_2_DEPTH))
    split(bisect_by=split1_surface_2, keep=Keep.TOP)


solid = Compound([body_2.part, part_1.part])
